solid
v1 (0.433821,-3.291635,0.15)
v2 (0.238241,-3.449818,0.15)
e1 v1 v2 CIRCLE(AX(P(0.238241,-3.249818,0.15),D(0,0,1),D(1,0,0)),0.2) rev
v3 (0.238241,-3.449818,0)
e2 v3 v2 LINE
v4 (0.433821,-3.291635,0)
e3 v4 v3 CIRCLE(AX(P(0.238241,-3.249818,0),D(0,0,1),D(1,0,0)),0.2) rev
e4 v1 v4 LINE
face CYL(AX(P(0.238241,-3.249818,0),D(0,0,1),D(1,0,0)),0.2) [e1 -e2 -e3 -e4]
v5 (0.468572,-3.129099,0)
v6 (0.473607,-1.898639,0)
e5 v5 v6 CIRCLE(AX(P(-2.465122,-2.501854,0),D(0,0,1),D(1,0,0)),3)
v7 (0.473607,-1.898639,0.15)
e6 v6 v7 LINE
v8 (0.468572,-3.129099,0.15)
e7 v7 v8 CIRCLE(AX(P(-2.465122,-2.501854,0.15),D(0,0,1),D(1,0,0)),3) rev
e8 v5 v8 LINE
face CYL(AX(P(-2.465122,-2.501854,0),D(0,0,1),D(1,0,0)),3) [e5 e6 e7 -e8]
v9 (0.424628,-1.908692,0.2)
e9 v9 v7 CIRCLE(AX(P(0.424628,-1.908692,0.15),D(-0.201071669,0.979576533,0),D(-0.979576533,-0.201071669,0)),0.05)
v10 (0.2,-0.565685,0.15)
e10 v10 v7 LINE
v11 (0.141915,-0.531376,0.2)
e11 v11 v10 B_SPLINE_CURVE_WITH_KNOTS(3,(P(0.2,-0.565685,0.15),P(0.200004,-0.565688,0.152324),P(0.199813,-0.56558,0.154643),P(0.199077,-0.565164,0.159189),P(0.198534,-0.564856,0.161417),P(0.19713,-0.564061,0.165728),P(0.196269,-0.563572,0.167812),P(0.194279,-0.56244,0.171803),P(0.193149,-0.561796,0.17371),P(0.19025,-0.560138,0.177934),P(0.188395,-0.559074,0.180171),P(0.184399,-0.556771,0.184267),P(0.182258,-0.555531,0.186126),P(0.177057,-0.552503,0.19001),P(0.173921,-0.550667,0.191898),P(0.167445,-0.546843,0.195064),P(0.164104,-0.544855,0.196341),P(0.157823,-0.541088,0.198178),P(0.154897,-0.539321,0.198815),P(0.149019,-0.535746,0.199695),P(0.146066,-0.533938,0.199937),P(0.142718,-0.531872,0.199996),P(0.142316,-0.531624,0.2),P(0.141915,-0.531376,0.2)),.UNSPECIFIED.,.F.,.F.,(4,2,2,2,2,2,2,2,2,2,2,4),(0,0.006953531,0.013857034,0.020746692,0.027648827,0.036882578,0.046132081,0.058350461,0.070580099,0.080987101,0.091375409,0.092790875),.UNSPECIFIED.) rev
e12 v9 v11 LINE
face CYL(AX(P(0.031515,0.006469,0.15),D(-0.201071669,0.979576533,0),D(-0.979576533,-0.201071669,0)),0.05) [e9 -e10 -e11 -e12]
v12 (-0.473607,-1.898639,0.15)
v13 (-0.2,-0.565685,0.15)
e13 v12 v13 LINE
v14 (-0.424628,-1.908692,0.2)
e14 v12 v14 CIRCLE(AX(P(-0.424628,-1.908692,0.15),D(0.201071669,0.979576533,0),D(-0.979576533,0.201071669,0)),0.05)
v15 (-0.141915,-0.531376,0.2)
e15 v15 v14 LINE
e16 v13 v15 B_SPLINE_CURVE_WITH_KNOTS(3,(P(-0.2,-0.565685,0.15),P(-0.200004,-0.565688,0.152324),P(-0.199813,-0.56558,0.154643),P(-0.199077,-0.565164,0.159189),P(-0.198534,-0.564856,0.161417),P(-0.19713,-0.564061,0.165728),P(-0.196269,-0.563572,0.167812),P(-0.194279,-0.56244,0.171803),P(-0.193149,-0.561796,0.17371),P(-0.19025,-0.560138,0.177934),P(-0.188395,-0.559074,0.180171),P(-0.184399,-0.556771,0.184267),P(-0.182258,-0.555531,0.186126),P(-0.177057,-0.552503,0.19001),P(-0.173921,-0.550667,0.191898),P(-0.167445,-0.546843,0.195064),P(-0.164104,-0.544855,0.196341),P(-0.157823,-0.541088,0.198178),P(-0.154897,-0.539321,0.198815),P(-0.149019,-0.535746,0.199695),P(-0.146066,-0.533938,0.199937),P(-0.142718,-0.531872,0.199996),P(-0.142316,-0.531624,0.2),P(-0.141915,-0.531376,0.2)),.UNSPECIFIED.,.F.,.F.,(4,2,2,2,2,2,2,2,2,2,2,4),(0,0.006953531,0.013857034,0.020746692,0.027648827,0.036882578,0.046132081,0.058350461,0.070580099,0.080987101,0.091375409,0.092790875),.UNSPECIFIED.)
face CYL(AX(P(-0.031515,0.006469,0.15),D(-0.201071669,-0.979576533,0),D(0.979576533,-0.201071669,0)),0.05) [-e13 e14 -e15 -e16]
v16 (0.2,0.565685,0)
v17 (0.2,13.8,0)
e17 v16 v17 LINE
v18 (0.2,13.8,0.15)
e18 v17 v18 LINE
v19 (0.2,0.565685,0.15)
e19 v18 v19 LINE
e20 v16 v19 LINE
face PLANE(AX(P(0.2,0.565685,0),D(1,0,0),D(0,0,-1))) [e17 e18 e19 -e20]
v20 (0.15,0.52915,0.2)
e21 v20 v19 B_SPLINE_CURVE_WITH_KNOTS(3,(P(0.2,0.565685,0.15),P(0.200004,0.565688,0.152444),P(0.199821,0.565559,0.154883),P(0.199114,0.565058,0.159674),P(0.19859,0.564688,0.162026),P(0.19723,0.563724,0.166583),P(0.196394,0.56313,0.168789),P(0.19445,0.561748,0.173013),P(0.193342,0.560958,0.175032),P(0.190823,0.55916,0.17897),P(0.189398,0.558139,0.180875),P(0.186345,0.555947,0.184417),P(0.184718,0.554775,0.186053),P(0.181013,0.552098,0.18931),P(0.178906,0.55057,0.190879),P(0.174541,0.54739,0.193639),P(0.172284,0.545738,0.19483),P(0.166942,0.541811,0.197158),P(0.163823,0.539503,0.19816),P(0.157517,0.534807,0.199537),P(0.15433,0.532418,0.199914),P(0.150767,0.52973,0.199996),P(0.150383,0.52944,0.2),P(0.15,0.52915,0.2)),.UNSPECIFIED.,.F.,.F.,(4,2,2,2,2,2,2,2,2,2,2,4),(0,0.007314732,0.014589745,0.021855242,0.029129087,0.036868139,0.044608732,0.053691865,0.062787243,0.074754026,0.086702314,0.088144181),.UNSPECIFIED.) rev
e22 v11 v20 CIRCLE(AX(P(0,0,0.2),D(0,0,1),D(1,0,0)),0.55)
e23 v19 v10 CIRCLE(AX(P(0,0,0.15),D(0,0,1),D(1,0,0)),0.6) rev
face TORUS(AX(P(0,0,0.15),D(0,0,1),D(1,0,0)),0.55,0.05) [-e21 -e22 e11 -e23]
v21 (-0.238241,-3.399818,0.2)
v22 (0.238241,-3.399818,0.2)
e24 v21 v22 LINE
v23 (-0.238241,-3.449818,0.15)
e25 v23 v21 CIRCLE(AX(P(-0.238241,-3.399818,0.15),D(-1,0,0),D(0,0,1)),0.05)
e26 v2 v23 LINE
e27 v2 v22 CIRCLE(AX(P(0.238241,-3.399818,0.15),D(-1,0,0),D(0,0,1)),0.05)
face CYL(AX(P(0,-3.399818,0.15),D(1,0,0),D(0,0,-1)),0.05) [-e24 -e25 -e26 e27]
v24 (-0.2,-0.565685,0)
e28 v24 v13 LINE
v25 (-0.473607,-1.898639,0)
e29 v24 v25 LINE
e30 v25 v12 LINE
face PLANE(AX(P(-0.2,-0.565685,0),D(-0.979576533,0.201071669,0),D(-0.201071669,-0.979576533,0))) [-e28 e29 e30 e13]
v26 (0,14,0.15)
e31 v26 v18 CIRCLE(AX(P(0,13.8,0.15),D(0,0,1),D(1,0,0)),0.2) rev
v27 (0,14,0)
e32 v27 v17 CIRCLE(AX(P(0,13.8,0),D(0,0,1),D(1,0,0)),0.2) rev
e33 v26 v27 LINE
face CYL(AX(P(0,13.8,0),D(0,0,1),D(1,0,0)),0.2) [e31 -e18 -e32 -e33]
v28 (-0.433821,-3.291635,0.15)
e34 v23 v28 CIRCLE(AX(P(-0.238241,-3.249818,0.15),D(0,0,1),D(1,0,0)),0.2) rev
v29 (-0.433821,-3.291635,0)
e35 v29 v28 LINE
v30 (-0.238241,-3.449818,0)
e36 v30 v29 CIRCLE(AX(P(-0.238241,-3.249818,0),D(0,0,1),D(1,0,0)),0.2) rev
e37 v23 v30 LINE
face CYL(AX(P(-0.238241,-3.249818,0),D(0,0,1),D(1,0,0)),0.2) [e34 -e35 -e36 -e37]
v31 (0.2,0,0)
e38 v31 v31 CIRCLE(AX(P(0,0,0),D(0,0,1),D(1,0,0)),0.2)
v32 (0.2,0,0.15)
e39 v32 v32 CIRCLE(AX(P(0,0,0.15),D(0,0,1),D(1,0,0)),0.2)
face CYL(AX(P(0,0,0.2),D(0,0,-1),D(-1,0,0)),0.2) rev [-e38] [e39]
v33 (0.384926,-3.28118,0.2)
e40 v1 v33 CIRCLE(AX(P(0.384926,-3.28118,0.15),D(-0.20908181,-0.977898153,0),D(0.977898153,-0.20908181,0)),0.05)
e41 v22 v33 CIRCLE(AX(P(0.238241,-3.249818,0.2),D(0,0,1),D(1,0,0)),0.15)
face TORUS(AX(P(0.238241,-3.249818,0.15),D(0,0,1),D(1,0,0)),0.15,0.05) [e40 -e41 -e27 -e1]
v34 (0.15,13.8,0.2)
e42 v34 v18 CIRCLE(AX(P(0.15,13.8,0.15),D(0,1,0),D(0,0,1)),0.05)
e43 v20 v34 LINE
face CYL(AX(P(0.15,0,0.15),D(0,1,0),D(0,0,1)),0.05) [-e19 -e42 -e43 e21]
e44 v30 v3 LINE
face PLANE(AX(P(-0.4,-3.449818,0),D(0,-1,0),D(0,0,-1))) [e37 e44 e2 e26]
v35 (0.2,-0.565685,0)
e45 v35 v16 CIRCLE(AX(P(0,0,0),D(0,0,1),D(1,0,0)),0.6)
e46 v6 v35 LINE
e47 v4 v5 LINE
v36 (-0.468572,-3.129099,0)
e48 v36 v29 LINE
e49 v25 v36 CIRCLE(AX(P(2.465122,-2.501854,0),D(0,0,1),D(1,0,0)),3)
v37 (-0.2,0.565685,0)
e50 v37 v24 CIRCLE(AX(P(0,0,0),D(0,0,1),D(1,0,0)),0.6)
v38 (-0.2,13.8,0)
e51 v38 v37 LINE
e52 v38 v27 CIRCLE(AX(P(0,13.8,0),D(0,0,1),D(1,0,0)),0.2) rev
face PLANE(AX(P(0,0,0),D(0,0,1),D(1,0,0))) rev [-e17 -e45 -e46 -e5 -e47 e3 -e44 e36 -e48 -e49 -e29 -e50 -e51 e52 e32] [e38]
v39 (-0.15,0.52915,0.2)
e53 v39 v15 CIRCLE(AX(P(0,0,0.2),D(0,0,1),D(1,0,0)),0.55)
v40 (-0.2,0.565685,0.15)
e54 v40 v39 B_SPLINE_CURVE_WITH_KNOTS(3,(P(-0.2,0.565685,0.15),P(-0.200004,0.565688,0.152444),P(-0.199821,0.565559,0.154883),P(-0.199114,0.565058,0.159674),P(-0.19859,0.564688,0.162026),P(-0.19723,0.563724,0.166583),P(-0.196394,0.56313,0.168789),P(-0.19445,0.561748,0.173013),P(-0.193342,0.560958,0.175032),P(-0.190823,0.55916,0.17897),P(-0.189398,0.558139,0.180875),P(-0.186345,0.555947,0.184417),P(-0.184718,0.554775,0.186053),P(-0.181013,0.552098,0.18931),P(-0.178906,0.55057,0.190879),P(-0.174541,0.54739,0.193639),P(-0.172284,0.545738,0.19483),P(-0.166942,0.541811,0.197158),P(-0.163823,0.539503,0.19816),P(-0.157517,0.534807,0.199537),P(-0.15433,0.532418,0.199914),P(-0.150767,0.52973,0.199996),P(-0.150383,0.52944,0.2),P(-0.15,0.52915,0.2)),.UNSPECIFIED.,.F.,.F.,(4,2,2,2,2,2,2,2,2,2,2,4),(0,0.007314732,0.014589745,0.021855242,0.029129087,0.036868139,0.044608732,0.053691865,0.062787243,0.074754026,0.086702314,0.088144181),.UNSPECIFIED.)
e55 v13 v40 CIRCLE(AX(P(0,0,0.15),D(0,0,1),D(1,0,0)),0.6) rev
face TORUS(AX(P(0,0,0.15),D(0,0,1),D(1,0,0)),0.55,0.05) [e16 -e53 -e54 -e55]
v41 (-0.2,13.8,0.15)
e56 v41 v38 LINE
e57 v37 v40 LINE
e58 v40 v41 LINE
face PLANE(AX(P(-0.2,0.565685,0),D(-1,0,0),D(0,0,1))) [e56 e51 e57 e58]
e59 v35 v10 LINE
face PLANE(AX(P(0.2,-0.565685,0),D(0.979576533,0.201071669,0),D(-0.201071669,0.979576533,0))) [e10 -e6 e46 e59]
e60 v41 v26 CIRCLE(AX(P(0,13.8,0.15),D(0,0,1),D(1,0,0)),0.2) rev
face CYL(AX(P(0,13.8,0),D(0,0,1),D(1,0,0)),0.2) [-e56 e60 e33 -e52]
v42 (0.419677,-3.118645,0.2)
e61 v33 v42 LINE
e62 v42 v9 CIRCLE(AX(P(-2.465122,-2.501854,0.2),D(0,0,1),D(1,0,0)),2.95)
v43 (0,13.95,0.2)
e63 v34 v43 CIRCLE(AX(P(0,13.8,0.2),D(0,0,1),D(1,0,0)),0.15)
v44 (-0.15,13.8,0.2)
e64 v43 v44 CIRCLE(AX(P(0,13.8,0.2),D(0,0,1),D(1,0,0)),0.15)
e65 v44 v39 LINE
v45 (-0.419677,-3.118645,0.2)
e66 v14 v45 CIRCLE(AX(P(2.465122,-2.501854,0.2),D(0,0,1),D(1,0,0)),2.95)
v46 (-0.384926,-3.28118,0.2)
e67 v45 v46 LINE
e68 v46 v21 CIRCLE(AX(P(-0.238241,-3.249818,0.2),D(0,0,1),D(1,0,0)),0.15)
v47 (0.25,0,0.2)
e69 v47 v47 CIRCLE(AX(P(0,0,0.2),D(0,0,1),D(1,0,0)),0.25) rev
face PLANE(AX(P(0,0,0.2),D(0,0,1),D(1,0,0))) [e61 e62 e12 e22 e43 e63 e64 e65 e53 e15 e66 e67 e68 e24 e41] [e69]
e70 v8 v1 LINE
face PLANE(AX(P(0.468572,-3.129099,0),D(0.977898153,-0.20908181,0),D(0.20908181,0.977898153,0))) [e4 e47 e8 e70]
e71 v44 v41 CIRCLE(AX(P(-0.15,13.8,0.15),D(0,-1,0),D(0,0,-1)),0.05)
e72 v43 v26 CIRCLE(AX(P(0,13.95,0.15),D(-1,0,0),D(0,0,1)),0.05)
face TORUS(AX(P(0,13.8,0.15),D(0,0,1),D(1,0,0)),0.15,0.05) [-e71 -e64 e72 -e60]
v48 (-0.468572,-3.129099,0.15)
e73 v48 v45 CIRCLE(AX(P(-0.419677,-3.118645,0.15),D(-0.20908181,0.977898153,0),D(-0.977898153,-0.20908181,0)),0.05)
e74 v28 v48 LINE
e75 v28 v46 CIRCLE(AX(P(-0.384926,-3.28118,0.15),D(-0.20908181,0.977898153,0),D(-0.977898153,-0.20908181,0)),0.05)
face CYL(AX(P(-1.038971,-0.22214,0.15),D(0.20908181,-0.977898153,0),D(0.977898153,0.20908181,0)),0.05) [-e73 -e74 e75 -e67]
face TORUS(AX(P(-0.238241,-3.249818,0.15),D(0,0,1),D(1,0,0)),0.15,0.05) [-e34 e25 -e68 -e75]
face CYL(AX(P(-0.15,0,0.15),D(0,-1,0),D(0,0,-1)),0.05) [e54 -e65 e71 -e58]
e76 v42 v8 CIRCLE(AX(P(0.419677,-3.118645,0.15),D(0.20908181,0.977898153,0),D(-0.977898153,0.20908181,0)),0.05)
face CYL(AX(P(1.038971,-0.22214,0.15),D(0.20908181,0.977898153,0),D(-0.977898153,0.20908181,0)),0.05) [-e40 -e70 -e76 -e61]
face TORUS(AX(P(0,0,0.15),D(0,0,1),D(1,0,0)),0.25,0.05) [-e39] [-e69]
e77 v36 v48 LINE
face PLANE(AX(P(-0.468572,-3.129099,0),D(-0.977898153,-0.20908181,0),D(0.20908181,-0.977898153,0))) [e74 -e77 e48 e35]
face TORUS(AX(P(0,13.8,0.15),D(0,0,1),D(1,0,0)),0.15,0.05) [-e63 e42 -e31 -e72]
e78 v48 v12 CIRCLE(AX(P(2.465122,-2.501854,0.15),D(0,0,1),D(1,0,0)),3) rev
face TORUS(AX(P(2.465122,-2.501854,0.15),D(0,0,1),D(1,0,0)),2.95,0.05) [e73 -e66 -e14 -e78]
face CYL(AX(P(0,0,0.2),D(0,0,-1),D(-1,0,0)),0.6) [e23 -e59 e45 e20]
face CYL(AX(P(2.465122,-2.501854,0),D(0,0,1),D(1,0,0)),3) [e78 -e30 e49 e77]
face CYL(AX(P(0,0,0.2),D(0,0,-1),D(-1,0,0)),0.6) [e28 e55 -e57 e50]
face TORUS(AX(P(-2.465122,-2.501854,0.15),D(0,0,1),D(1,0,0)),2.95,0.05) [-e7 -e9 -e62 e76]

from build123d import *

# Parameters (mm, degrees)
SKETCH_1_R      = 0.6
SKETCH_1_R_2    = 0.2
EXTRUDE_1_DEPTH = 0.2
EXTRUDE_START   = -0.2
EXTRUDE_2_DEPTH = 0.2
FILLET_1_R      = 0.2
FILLET_2_R      = 0.05


with BuildPart() as part:
    # Эскиз1 → Бобышка-Вытянуть1 (new body)
    with BuildSketch(Plane.XY):
        Circle(SKETCH_1_R)
        Circle(SKETCH_1_R_2, mode=Mode.SUBTRACT)
    extrude(amount=EXTRUDE_1_DEPTH)

    # Эскиз3 → Бобышка-Вытянуть2 (add)
    with BuildSketch(Plane.XY.offset(0.2).offset(EXTRUDE_START)):
        with BuildLine():
            Line((-0.2, 0.565685425), (-0.2, 14))
            Line((-0.2, 14), (0.2, 14))
            Line((0.2, 14), (0.2, 0.565685425))
            ThreePointArc((0.2, 0.565685425), (0, 0.6), (-0.2, 0.565685425))
        make_face()
        with BuildLine():
            Line((-0.2, -0.565685425), (-0.473607186, -1.89863889))
            ThreePointArc((-0.473607186, -1.89863889), (-0.53485247, -2.514130031), (-0.468572045, -3.129099328))
            Line((-0.468572045, -3.129099328), (-0.4, -3.44981817))
            Line((-0.4, -3.44981817), (0.4, -3.44981817))
            Line((0.4, -3.44981817), (0.468572045, -3.129099328))
            ThreePointArc((0.468572045, -3.129099328), (0.53485247, -2.514130031), (0.473607186, -1.89863889))
            Line((0.473607186, -1.89863889), (0.2, -0.565685425))
            ThreePointArc((0.2, -0.565685425), (0, -0.6), (-0.2, -0.565685425))
        make_face()
    extrude(amount=EXTRUDE_2_DEPTH)

    # Скругление1
    fillet_1_edges = [part.edges().sort_by_distance(p)[0] for p in [
        (-0.4, -3.44981817, 0.1),
        (0.4, -3.44981817, 0.1),
        (-0.2, 14, 0.1),
        (0.2, 14, 0.1),
    ]]
    fillet(fillet_1_edges, radius=FILLET_1_R - 0.0001)  # a hair under: the kernel refuses the full size

    # Скругление2
    fillet_2_edges = [part.edges().sort_by_distance(p)[0] for p in [
        (0.2, 7.182892712, 0.2),
        (0.6, 0, 0.2),
        (-0.336803593, -1.232162158, 0.2),
        (-0.53485247, -2.514130031, 0.2),
        (-0.451187979, -3.210406476, 0.2),
        (0.53485247, -2.514130031, 0.2),
        (0.336803593, -1.232162158, 0.2),
        (0, -3.44981817, 0.2),
        (0.451187979, -3.210406476, 0.2),
        (-0.2, 7.182892712, 0.2),
        (0.364030264, -3.405344875, 0.2),
        (-0.364030264, -3.405344875, 0.2),
        (0.141450646, 13.941450646, 0.2),
        (-0.141450646, 13.941450646, 0.2),
        (-0.2, 0, 0.2),
        (-0.6, 0, 0.2),
    ]]
    fillet(fillet_2_edges, radius=FILLET_2_R)


solid = part.part
